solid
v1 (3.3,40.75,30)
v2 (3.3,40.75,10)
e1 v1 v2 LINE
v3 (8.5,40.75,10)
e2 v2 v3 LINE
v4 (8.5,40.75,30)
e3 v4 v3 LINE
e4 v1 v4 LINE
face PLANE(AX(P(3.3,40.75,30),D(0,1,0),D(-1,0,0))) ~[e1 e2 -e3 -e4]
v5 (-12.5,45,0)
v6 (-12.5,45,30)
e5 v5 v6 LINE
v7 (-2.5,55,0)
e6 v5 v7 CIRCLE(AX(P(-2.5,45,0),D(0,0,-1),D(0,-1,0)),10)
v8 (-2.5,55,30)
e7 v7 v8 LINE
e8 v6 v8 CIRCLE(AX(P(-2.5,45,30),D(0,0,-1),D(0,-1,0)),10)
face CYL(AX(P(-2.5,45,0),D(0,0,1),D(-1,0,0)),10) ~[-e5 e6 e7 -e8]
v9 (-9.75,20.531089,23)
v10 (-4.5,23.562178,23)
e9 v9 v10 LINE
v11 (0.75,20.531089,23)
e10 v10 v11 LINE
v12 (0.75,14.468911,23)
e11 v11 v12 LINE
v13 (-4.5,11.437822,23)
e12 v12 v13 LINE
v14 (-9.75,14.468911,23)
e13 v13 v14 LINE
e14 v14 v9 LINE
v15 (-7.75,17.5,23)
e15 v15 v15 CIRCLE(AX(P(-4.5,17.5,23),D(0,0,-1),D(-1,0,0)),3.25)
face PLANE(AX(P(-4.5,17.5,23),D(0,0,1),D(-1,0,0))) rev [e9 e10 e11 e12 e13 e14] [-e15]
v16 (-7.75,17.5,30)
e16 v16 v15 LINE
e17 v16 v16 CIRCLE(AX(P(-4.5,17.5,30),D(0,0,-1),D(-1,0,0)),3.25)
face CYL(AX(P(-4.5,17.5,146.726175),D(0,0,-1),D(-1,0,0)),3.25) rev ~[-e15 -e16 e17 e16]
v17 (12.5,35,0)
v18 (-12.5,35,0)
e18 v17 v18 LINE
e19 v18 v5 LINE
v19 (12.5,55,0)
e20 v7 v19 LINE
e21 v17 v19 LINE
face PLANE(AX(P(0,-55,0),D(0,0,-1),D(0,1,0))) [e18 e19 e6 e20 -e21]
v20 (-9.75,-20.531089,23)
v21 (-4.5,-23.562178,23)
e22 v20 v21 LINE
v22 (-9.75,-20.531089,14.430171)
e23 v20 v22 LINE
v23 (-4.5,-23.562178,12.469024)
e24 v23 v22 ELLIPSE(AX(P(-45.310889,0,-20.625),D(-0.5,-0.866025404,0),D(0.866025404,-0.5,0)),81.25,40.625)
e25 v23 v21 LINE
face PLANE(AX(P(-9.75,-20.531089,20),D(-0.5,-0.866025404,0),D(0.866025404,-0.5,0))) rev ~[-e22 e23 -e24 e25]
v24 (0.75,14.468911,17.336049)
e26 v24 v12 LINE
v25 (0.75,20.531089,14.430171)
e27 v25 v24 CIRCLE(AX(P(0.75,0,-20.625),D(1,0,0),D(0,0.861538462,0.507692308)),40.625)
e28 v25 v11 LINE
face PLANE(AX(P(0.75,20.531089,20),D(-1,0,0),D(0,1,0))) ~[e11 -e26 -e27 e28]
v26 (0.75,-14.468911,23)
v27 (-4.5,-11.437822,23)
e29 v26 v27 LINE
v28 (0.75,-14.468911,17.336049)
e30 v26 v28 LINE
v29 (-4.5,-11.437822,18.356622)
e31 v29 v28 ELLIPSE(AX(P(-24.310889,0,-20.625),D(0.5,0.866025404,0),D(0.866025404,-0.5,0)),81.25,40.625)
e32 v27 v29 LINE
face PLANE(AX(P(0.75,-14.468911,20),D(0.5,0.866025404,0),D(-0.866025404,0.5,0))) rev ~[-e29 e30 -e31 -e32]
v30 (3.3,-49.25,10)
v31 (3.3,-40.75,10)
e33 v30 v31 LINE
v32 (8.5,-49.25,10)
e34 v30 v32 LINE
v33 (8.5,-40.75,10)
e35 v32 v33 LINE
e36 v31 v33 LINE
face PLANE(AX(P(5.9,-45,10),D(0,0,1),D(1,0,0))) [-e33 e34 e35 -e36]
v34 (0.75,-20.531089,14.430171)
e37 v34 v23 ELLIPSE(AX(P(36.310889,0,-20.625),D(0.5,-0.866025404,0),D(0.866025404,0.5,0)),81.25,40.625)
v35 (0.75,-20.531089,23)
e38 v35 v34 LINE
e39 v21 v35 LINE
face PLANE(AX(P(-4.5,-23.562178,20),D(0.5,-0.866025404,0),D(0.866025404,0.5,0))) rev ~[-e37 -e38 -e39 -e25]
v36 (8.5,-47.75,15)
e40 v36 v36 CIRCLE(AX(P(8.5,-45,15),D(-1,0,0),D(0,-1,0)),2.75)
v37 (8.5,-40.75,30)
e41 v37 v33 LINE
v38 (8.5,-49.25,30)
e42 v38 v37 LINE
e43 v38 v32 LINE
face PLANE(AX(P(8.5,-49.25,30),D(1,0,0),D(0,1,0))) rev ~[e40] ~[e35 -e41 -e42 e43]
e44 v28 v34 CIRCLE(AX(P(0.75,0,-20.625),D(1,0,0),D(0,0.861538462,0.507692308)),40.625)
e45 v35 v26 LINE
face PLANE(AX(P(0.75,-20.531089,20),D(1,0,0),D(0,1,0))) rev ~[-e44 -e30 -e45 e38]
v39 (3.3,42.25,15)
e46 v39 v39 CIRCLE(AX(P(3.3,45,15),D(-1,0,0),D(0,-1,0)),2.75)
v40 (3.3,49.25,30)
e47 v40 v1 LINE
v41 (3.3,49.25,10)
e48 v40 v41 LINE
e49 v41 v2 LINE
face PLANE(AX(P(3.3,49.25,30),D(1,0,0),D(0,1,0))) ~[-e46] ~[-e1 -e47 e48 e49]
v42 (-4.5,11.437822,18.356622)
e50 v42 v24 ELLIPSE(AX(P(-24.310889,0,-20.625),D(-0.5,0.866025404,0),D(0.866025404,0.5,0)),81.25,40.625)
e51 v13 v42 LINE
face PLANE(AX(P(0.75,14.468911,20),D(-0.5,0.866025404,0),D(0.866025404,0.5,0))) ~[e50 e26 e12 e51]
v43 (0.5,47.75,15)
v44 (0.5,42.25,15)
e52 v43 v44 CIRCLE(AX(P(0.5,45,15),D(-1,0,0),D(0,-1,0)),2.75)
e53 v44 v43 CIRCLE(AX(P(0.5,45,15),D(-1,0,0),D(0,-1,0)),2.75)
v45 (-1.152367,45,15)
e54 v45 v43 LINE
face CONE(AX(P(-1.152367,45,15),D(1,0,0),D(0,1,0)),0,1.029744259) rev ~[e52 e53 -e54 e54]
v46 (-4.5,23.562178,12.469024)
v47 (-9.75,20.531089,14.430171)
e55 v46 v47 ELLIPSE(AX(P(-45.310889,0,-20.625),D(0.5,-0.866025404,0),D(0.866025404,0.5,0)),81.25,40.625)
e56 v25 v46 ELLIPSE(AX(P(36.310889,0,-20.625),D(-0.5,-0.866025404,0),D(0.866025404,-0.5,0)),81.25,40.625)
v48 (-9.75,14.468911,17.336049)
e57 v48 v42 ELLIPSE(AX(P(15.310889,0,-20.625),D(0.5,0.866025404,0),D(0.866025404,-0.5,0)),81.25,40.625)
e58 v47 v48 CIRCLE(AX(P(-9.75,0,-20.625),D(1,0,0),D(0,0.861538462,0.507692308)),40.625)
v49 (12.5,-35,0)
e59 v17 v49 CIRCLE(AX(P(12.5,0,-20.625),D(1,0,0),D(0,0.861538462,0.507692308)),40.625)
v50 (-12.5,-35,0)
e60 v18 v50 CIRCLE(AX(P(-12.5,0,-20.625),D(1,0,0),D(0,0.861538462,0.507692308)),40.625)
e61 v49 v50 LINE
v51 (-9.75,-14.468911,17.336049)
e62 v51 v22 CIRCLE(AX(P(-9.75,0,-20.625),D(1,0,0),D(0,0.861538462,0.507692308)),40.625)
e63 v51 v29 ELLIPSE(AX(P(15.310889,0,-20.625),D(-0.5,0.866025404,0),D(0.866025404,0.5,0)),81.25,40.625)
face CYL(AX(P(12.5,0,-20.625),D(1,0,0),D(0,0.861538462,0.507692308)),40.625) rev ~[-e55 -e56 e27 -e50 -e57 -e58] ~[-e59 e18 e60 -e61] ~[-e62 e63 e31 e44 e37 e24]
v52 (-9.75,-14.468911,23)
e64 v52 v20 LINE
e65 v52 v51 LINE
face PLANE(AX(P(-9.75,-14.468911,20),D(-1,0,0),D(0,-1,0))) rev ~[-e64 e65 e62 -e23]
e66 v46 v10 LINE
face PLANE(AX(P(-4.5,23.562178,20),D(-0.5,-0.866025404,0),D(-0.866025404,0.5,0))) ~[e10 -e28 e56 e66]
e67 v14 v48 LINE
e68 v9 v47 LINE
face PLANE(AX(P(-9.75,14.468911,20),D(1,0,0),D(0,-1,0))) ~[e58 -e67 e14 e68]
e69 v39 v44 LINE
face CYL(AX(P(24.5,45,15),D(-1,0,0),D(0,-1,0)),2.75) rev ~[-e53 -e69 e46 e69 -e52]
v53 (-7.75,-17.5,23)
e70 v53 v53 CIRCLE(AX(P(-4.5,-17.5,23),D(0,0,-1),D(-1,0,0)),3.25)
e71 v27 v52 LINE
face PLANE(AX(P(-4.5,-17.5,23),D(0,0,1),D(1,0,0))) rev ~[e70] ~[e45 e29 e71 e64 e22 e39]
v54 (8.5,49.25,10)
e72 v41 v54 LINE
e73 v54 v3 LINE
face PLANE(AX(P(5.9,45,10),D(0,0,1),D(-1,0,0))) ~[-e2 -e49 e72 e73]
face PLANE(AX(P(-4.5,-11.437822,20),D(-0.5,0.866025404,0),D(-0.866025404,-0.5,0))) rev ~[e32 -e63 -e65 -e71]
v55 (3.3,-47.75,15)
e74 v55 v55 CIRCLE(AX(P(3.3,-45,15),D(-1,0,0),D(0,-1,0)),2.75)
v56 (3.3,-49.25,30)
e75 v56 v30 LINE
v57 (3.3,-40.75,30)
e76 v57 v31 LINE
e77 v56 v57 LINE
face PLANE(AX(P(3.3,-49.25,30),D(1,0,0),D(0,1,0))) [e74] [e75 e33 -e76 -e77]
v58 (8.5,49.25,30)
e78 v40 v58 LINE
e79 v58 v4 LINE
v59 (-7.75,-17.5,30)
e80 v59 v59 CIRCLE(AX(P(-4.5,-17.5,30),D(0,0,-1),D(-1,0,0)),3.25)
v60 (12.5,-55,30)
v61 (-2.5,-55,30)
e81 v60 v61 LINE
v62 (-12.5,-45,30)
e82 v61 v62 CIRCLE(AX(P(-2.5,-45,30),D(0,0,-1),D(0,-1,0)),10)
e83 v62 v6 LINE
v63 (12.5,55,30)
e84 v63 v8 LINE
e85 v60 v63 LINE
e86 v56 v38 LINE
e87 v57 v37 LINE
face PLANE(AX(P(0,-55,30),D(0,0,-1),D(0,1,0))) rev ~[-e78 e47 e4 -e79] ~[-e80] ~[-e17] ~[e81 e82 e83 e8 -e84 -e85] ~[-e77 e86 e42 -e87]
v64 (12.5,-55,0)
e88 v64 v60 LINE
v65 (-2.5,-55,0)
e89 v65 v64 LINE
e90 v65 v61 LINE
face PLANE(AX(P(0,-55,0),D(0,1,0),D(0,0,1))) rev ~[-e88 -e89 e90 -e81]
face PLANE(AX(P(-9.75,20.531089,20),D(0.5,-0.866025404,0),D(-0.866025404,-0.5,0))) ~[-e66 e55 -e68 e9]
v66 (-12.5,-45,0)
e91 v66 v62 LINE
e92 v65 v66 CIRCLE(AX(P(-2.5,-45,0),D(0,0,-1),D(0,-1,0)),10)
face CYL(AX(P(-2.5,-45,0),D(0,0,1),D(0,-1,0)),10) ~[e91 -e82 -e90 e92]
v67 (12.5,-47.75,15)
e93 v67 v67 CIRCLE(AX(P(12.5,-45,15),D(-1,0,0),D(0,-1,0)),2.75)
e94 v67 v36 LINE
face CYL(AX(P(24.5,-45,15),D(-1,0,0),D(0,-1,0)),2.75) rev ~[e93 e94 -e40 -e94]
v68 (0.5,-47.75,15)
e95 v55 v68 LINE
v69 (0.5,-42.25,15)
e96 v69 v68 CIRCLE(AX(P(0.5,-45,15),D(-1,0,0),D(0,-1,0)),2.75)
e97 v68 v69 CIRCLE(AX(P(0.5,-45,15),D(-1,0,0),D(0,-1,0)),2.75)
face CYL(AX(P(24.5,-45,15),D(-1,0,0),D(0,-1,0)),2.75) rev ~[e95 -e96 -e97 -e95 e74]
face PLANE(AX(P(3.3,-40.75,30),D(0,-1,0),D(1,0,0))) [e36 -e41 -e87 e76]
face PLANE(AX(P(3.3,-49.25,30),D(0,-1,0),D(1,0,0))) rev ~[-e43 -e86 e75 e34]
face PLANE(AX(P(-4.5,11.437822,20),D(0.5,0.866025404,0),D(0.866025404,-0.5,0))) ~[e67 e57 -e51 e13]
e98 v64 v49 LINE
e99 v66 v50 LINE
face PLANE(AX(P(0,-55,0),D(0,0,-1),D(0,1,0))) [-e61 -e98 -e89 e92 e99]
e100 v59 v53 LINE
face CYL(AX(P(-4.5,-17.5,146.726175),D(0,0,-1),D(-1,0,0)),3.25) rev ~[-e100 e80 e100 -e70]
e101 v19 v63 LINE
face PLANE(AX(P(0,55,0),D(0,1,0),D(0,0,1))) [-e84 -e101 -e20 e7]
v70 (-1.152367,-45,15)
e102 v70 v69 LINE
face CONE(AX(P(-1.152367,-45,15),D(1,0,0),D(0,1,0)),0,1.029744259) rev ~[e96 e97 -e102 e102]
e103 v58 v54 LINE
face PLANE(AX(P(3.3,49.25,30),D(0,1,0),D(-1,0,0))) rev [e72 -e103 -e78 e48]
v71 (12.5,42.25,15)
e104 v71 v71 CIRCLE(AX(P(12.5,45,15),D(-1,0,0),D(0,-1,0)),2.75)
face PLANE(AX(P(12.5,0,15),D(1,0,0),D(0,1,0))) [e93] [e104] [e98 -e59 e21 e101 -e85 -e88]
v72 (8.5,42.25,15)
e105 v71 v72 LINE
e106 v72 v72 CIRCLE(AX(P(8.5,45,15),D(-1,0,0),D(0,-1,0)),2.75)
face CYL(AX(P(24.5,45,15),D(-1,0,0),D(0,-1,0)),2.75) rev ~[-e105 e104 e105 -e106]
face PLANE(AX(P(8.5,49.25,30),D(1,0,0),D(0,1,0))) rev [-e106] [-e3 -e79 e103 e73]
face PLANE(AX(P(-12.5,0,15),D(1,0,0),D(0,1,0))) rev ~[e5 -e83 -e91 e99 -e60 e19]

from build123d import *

# Parameters (mm, degrees)
F0_W           = 110
F0_H           = 30
F1_DEPTH       = 12.5
F3_D           = 5.5
F3_DEPTH       = 12
F3_TIP         = 1.6523667023
F5_DEPTH       = 25
F7_D           = 6.5
F10_DEPTH      = 3
F10_DEPTH_BACK = 20.0010001
F11_W          = 5.2
F11_H          = 8.5
F12_DEPTH      = 20
F13_R          = 10


# Not quite as in the source:
# - a pattern or mirror of a feature is missing from the dataset's text; its kind, count and spacing are read off the source's solid


with BuildPart() as f1:
    # F0 (on Right) → F1 (new body, symmetric)
    with BuildSketch(Plane.YZ):
        with Locations((0, 15)):
            Rectangle(F0_W, F0_H)
    extrude(amount=F1_DEPTH, both=True)

    # F3
    with Locations(Plane.YZ.offset(12.5)):
        with Locations((-45, 15), (45, 15)):
            Hole(F3_D / 2, depth=F3_DEPTH)
            with Locations((0, 0, -(F3_DEPTH + F3_TIP / 2))):  # 118° drill point
                Cone(0, F3_D / 2, F3_TIP, mode=Mode.SUBTRACT)

    # F4 (on face) → F5 (cut, through all)
    with BuildSketch(Plane.YZ.offset(12.5)):
        with BuildLine():
            Line((-35, 0), (35, 0))
            ThreePointArc((35, 0), (0, 20), (-35, 0))
        make_face()
    extrude(amount=-F5_DEPTH, mode=Mode.SUBTRACT)

    # F7 (through all)
    with Locations(Plane.XY.offset(30)):
        with Locations((-4.5, 17.5), (-4.5, -17.5)):
            Hole(F7_D / 2)

    # F9 (on offset) → F10 (cut, two sides)
    with BuildSketch(Plane.XY.offset(20)) as f10_sk:
        Polygon((-9.75, -20.5310889132), (-4.5, -23.5621778265), (0.75, -20.5310889132), (0.75, -14.4689110868), (-4.5, -11.4378221735), (-9.75, -14.4689110868), align=None)
    f10 = extrude(amount=F10_DEPTH, mode=Mode.SUBTRACT) + extrude(f10_sk.sketch, amount=-F10_DEPTH_BACK, mode=Mode.SUBTRACT)

    # F10_copies: F10 across plane
    add(f10.mirror(Plane.ZX), mode=Mode.SUBTRACT)

    # F11 (on face) → F12 (cut)
    with BuildSketch(Plane.XY.offset(30)):
        with Locations((5.9, -45)):
            Rectangle(F11_W, F11_H)
    f12 = extrude(amount=-F12_DEPTH, mode=Mode.SUBTRACT)

    # F12_copies: F12 across plane
    add(f12.mirror(Plane.ZX), mode=Mode.SUBTRACT)

    # F13
    f13_edges = [f1.edges().sort_by_distance(p)[0] for p in [
        (-12.5, -55, 15),
        (-12.5, 55, 15),
    ]]
    fillet(f13_edges, radius=F13_R)


solid = f1.part
